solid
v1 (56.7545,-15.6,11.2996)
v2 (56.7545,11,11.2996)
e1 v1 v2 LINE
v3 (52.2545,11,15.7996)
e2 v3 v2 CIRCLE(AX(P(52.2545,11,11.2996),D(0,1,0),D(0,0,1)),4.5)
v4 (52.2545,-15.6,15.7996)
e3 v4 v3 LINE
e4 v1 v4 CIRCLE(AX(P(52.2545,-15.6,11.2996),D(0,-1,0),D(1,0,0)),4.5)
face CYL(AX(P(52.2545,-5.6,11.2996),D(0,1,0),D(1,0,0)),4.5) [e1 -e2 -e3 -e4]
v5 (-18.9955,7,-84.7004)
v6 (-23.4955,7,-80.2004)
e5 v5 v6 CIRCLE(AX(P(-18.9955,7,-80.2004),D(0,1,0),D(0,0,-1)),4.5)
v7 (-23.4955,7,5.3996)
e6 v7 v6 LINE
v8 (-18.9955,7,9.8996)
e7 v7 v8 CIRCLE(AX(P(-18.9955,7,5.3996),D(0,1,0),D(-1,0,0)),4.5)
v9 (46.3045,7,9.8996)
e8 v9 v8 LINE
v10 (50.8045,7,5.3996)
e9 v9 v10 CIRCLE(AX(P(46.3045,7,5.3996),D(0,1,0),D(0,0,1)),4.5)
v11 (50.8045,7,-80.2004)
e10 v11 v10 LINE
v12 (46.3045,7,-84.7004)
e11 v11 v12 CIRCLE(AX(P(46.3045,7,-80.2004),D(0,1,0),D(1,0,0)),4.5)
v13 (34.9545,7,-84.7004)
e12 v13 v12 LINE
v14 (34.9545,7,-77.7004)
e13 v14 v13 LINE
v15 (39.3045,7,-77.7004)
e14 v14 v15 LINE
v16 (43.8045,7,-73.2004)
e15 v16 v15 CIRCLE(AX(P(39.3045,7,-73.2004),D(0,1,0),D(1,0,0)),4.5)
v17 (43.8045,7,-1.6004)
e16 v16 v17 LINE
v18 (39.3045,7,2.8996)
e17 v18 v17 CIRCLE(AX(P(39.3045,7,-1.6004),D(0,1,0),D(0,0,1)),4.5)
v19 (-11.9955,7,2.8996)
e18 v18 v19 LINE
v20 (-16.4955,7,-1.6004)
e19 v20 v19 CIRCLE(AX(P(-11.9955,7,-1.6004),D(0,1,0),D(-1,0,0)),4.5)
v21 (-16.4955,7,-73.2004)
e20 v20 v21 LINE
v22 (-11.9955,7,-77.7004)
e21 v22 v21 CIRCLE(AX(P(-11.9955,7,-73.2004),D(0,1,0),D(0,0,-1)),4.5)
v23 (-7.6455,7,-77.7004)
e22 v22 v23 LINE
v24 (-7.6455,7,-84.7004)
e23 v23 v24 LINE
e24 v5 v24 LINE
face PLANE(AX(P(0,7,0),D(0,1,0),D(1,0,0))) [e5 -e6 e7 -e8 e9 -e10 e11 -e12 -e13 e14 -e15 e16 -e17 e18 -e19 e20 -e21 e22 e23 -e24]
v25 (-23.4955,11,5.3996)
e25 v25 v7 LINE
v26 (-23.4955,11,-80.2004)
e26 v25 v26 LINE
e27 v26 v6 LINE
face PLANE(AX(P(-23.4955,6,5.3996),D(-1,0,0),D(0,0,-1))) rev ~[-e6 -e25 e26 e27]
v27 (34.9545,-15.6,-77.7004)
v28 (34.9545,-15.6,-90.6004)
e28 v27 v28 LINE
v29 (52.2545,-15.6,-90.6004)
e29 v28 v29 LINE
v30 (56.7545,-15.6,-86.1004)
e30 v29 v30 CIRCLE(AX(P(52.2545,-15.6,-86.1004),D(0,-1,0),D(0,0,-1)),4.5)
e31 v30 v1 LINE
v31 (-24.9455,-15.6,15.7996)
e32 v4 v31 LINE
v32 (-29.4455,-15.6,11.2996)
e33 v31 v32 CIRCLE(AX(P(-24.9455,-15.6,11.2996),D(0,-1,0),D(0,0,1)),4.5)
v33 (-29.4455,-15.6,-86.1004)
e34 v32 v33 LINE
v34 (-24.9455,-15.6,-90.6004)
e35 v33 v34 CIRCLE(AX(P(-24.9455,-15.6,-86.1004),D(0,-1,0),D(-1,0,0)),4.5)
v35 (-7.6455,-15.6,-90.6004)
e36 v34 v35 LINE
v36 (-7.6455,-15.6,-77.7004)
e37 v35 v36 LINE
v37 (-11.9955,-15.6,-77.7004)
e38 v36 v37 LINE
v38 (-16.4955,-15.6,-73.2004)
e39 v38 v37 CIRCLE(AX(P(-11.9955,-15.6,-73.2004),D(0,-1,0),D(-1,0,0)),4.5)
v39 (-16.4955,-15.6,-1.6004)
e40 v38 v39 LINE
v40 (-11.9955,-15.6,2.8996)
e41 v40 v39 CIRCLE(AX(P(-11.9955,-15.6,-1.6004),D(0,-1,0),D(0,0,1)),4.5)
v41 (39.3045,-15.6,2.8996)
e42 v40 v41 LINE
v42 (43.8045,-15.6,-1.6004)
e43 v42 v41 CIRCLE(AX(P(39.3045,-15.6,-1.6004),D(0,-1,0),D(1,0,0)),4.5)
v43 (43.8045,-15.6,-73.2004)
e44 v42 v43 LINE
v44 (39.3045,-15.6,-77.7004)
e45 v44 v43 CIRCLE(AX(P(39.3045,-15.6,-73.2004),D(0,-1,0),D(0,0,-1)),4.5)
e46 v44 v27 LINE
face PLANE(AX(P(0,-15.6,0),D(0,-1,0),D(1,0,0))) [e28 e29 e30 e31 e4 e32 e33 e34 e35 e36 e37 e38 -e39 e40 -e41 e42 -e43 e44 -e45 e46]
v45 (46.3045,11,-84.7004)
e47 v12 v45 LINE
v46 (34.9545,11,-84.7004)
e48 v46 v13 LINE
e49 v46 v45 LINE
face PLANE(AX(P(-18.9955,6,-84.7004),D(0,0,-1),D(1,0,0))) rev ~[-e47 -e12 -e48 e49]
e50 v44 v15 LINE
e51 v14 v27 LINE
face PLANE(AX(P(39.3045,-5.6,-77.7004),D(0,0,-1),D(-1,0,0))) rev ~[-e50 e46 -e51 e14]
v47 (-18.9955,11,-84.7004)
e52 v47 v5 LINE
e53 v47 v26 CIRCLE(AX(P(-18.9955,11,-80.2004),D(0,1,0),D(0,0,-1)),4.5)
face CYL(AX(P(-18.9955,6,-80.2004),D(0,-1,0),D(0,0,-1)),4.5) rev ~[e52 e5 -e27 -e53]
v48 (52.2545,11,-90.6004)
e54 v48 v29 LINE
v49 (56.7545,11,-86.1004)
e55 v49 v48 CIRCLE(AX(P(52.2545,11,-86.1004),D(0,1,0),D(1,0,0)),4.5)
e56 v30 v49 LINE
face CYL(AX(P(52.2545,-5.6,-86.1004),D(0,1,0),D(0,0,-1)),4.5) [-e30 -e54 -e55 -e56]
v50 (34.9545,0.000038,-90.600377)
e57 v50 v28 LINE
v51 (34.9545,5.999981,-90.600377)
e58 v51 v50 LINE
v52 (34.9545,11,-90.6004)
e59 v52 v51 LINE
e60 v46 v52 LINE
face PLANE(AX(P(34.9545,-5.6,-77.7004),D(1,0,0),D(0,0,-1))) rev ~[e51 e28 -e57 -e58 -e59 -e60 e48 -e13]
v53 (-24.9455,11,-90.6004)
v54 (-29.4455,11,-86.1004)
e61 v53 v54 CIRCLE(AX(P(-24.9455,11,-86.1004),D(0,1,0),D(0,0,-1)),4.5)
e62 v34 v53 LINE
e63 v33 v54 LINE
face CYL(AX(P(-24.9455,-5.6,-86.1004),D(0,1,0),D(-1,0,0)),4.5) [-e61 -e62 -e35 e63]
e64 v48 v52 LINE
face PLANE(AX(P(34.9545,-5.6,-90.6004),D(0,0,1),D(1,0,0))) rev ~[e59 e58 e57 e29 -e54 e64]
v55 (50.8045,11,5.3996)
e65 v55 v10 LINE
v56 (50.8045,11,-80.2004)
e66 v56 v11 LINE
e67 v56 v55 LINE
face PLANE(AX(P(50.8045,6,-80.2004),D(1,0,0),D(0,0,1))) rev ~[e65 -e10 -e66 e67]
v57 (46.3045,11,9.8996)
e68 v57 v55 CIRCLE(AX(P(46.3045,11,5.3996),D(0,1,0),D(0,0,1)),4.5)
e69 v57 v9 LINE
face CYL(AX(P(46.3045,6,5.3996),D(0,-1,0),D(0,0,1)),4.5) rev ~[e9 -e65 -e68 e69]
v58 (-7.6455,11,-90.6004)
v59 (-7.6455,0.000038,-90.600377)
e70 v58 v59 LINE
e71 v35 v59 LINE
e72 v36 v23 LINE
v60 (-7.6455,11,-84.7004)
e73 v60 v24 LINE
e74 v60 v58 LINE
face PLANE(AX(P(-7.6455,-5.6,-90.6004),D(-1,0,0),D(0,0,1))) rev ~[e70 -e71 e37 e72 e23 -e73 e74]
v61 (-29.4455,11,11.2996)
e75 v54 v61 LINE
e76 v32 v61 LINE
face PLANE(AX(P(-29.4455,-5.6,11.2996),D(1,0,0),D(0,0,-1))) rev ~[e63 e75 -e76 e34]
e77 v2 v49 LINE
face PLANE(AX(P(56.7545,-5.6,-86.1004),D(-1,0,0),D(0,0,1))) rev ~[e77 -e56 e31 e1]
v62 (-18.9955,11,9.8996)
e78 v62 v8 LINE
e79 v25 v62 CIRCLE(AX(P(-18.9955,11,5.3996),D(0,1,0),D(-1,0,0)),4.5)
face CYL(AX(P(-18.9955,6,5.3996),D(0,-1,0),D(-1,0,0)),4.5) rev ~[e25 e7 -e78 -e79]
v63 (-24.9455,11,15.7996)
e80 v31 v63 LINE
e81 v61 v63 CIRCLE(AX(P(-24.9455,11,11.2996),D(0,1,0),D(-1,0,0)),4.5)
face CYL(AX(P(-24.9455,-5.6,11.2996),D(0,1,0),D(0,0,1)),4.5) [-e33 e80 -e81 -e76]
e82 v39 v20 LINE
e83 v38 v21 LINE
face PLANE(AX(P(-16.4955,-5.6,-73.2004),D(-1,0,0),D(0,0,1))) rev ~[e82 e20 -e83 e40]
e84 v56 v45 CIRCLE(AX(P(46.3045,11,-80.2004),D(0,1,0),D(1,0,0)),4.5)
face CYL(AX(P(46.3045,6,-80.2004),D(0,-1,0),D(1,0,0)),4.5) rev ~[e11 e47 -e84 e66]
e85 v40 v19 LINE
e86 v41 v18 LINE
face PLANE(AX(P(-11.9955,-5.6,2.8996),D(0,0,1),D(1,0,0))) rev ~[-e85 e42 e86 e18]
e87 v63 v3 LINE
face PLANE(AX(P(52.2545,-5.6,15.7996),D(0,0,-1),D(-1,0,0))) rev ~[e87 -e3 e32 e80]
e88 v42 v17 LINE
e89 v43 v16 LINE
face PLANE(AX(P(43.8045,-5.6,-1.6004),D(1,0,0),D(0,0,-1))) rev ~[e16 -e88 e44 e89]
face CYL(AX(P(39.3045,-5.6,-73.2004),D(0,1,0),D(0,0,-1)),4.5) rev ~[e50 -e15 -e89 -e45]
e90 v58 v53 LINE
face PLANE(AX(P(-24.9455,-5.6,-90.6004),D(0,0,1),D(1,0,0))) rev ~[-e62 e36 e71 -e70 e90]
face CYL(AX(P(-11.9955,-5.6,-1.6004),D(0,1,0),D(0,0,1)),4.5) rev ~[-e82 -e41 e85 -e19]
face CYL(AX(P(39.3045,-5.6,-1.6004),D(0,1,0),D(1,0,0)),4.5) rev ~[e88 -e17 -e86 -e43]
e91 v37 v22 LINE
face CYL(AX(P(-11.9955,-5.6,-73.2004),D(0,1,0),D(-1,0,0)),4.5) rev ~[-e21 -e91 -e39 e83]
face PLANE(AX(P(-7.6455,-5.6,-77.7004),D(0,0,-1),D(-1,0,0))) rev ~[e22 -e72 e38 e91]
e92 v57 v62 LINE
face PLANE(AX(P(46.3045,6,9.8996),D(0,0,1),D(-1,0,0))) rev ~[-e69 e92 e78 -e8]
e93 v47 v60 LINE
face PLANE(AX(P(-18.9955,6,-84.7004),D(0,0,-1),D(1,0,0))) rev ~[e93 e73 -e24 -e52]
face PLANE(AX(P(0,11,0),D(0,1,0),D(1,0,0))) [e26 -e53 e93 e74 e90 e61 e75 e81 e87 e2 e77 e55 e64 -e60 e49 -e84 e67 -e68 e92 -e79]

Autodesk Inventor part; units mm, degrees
ref_plane "YZ Plane" through (0, 0, 0) normal (1, 0, 0) x (0, 1, 0)
ref_plane "XZ Plane" through (0, 0, 0) normal (0, 1, 0) x (-1, 0, 0)
ref_plane "XY Plane" through (0, 0, 0) normal (0, 0, 1) x (1, 0, 0)
sketch "Sketch1" plane through (0, 0, 0) normal (0, 1, 0) x (-1, 0, 0)
  line L0 (23.4955, 9.8996) -> (-50.8045, 9.8996)
  line L1 (-50.8045, 9.8996) -> (-50.8045, -84.7004)
  line L2 (-50.8045, -84.7004) -> (23.4955, -84.7004)
  line L3 (23.4955, -84.7004) -> (23.4955, 9.8996)
  line L4 (29.4455, 15.7996) -> (-56.7545, 15.7996)
  line L5 (-56.7545, 15.7996) -> (-56.7545, -90.6004)
  line L6 (-56.7545, -90.6004) -> (29.4455, -90.6004)
  line L7 (29.4455, -90.6004) -> (29.4455, 15.7996)
  line L8 (29.4455, -37.4004) -> (-56.7545, -37.4004) construction
  line L9 (-13.6545, -90.6004) -> (-13.6545, 15.7996) construction
  dimension "d0" = 94.6
  dimension "d1" = 74.3
  dimension "d2" = 106.4
  dimension "d3" = 86.2
extrude "Extrusion1" add sketch "Sketch1" along normal blind 6
fillet "Fillet1" radius 4.5 4 edges at (-23.4955, 3, 9.8996) (50.8045, 3, 9.8996) (50.8045, 3, -84.7004) (-23.4955, 3, -84.7004)
fillet "Fillet2" radius 4.5 4 edges at (56.7545, 3, 15.7996) (-29.4455, 3, 15.7996) (56.7545, 3, -90.6004) (-29.4455, 3, -90.6004)
sketch "Sketch2" plane through (0, 0, 0) normal (0, -1, 0) x (1, 0, 0)
  line L0 (50.8045, -80.2004) -> (50.8045, 5.3996) projected
  arc A0 (46.3045, -84.7004) -> (50.8045, -80.2004) centre (46.3045, -80.2004) ccw projected
  line L1 (-18.9955, -84.7004) -> (46.3045, -84.7004) projected
  arc A1 (-23.4955, -80.2004) -> (-18.9955, -84.7004) centre (-18.9955, -80.2004) ccw projected
  line L2 (-23.4955, 5.3996) -> (-23.4955, -80.2004) projected
  arc A2 (-18.9955, 9.8996) -> (-23.4955, 5.3996) centre (-18.9955, 5.3996) ccw projected
  line L3 (46.3045, 9.8996) -> (-18.9955, 9.8996) projected
  arc A3 (50.8045, 5.3996) -> (46.3045, 9.8996) centre (46.3045, 5.3996) ccw projected
  line L4 (43.8045, -77.7004) -> (-16.4955, -77.7004)
  line L5 (-16.4955, -77.7004) -> (-16.4955, 2.8996)
  line L6 (-16.4955, 2.8996) -> (43.8045, 2.8996)
  line L7 (43.8045, 2.8996) -> (43.8045, -77.7004)
  line L8 (13.6545, -84.7004) -> (13.6545, 9.8996) construction
  line L9 (46.3045, 9.8996) -> (-18.9955, 9.8996) construction
  line L10 (50.8045, -80.2004) -> (50.8045, 5.3996) construction
  line L11 (50.8045, -37.4004) -> (-23.4955, -37.4004) construction
  line L12 (56.7545, 11.2996) -> (56.7545, -86.1004) construction
  point P0 (0, 0)
  dimension "d8" = 5.95
  dimension "d9" = 7
  dimension "d10" = 7
extrude "Extrusion2" add sketch "Sketch2" along normal blind 6
fillet "Fillet3" radius 4.5 4 edges at (43.8045, -3, -77.7004) (43.8045, -3, 2.8996) (-16.4955, -3, 2.8996) (-16.4955, -3, -77.7004)
sketch "Sketch3" plane through (0, 0, 0) normal (0, 1, 0) x (1, 0, 0)
  arc A0 (46.3045, -9.8996) -> (50.8045, -5.3996) centre (46.3045, -5.3996) ccw projected
  line L0 (50.8045, 80.2004) -> (50.8045, -5.3996) projected
  arc A1 (50.8045, 80.2004) -> (46.3045, 84.7004) centre (46.3045, 80.2004) ccw projected
  line L1 (-18.9955, 84.7004) -> (46.3045, 84.7004) projected
  arc A2 (-18.9955, 84.7004) -> (-23.4955, 80.2004) centre (-18.9955, 80.2004) ccw projected
  line L2 (-23.4955, -5.3996) -> (-23.4955, 80.2004) projected
  arc A3 (-23.4955, -5.3996) -> (-18.9955, -9.8996) centre (-18.9955, -5.3996) ccw projected
  line L3 (46.3045, -9.8996) -> (-18.9955, -9.8996) projected
  arc A4 (43.8045, 73.2004) -> (39.3045, 77.7004) centre (39.3045, 73.2004) ccw projected
  line L4 (43.8045, 1.6004) -> (43.8045, 73.2004) projected
  arc A5 (39.3045, -2.8996) -> (43.8045, 1.6004) centre (39.3045, 1.6004) ccw projected
  line L5 (-11.9955, -2.8996) -> (39.3045, -2.8996) projected
  arc A6 (-16.4955, 1.6004) -> (-11.9955, -2.8996) centre (-11.9955, 1.6004) ccw projected
  line L6 (-16.4955, 73.2004) -> (-16.4955, 1.6004) projected
  arc A7 (-11.9955, 77.7004) -> (-16.4955, 73.2004) centre (-11.9955, 73.2004) ccw projected
  line L7 (39.3045, 77.7004) -> (-11.9955, 77.7004) projected
  point P0 (0, 0)
extrude "Extrusion3" add sketch "Sketch3" along normal blind 2
ref_plane "Work Plane1" through (-23.4955, 6, -84.7004) normal (0, 0.7071068, -0.7071068) x (1, 0, 0)
sketch "Sketch5" plane through (-23.4955, 6, -84.7004) normal (0, 0.7071068, -0.7071068) x (1, 0, 0)
  line L0 (4.5, 0) -> (69.8, 0) projected
  line L1 (37.15, 0) -> (37.15, -42.3796) construction
  circle A0 centre (37.15, 1.34) radius 1.34 construction
  line L2 (37.15, 1.34) -> (37.15, -18.66) construction
  line L3 (38.49, 1.34) -> (38.49, -18.66)
  line L4 (35.81, -18.66) -> (35.81, 1.34)
  arc A1 (38.49, 1.34) -> (35.81, 1.34) centre (37.15, 1.34) ccw
  arc A2 (35.81, -18.66) -> (38.49, -18.66) centre (37.15, -18.66) ccw
  point P0 (23.4955, -55.6496)
  point P1 (37.15, -8.66)
  dimension "d20" = 2.68
  dimension "d19" = 90
  dimension "d21" = 20
  dimension "d22" = 2.68
extrude "Extrusion5" cut sketch "Sketch5" along normal mid plane 51.82
sketch "Sketch6" plane through (-23.4955, 6, -84.7004) normal (0, 0.7071068, -0.7071068) x (1, 0, 0)
  arc A0 (38.49, 1.34) -> (35.81, 1.34) centre (37.15, 1.34) ccw projected
  line L0 (38.49, 0) -> (38.49, 1.34) projected
  arc A1 (38.49, 1.34) -> (35.81, 1.34) centre (37.15, 1.34) ccw projected
  line L1 (35.81, 1.34) -> (35.81, 0) projected
  line L2 (4.5, 0) -> (35.81, 0) projected
  line L3 (4.5, 2.8284) -> (4.5, 0) projected
  line L4 (4.5, 2.8284) -> (69.8, 2.8284) projected
  line L5 (69.8, 0) -> (69.8, 2.8284) projected
  line L6 (38.49, 0) -> (69.8, 0) projected
  line L7 (75.75, 8.4146) -> (-1.45, 8.4146) projected
  line L8 (74.9473, 2.68) -> (-18.0058, 2.68) construction
  line L9 (0, -55.225) -> (0, 5.3033) construction
  line L10 (90.8097, 9.1284) -> (-67.1811, 9.1284) construction
  line L11 (37.15, 2.68) -> (37.15, 37.6448) construction
  line L12 (58.45, 9.1284) -> (15.85, 9.1284)
  line L13 (15.85, 9.1284) -> (15.85, 13.1284)
  line L14 (15.85, 13.1284) -> (58.45, 13.1284)
  line L15 (58.45, 13.1284) -> (58.45, 9.1284)
  point P0 (23.4955, -55.6496)
  dimension "d25" = 6.3
  dimension "d26" = 42.6
  dimension "d27" = 4
extrude "Extrusion6" add sketch "Sketch6" along normal blind 35 contours L12 L13 L14 L15
sketch "Sketch7" plane through (-23.4955, 30.7487, -109.4492) normal (0, 0.7071068, -0.7071068) x (-1, 0, 0)
  line L0 (-15.85, -13.1284) -> (-15.85, -9.1284) projected
  line L1 (-58.45, -9.1284) -> (-58.45, -13.1284) projected
  point P0 (-23.4955, 55.6496)
  point P1 (-15.85, -11.1284)
  point P2 (-58.45, -11.1284)
  dimension "d30" = 42.6
sketch "Sketch8" plane through (34.9545, -3.2832, -93.9836) normal (1, 0, 0) x (0, 0.7071068, -0.7071068)
  line L0 (-0.0707, 4.7139) -> (-3.2527, 7.8958) projected
  line L1 (0.9899, 12.1385) -> (4.1719, 8.9565) projected
  line L2 (0, 0) -> (35, 0) projected
  line L3 (-0.0707, 4.7139) -> (-14.2134, -9.4288) construction
  line L4 (0, 4) -> (35, 4) projected
  line L5 (0, 4) -> (0, 0) projected
  line L6 (4.1719, 8.9565) -> (-4.7846, 0)
  line L7 (-4.7846, 0) -> (0, 0)
  line L8 (0, 0) -> (0, 4) projected
  line L9 (0, 0) -> (0, 4)
  line L10 (4.1719, 8.9565) -> (4.1719, 4)
  line L11 (0, 4) -> (35, 4) projected
  line L12 (4.1719, 4) -> (0, 4)
  line L13 (-0.0707, 4.7139) -> (4.1719, 8.9565) projected
  point P0 (-64.1349, 68.778)
  point P1 (4.1719, 4)
extrude "Extrusion7" add sketch "Sketch8" against normal blind 42.6
sketch "Sketch9" plane through (34.9545, -6.6664, -90.6004) normal (1, 0, 0) x (0, 0, -1)
  line L0 (0, 6.6664) -> (0, 0) projected
  line L1 (0, 0) -> (28.1319, 28.1319) projected
  line L2 (0, 0) -> (0, 6.6664) projected
  line L3 (0, 0) -> (0, -20)
  line L4 (0, -20) -> (5, -20)
  line L5 (5, -20) -> (5, 5)
  line L6 (0, 0) -> (28.1319, 28.1319) projected
  line L7 (5, 5) -> (0, 0)
  point P0 (-90.6004, 6.6664)
  point P1 (5, 5)
  dimension "d33" = 5
  dimension "d34" = 20
extrude "Extrusion8" add sketch "Sketch9" against normal blind 42.6
sketch "Sketch10" plane through (-7.6455, 24.294, -115.9039) normal (0, 0.7071068, 0.7071068) x (1, 0, 0)
  line L0 (0, -30.8281) -> (42.6, -30.8281) projected
  line L1 (42.6, -30.8281) -> (42.6, 0) projected
  line L2 (0, 0) -> (42.6, 0) projected
  line L3 (0, -30.8281) -> (0, 0) projected
  line L4 (42.6, -30.8281) -> (0, -30.8281) projected
  line L5 (0, -30.8281) -> (5, -30.8281)
  line L6 (5, -30.8281) -> (5, 0)
  line L7 (5, 0) -> (0, 0)
  line L8 (0, 0) -> (0, -30.8281)
  line L9 (42.6, 0) -> (0, 0) projected
  line L10 (37.6, 0) -> (42.6, 0)
  line L11 (42.6, 0) -> (42.6, -30.8281)
  line L12 (42.6, -30.8281) -> (37.6, -30.8281)
  line L13 (37.6, -30.8281) -> (37.6, 0)
  point P0 (7.6455, -99.1349)
  point P1 (37.6, 0)
  point P2 (37.6, -30.8281)
  dimension "d37" = 5
  dimension "d38" = 5
extrude "Extrusion9" add sketch "Sketch10" along normal blind 19 contours L3 L2 L6 L0 | L13 L2 L1 L0
sketch "Sketch11" plane through (-7.6455, 37.729, -102.4689) normal (0, 0.7071068, 0.7071068) x (1, 0, 0)
  line L0 (0, -30.8281) -> (5, -30.8281) projected
  line L1 (5, 0) -> (0, 0) projected
  point P0 (7.6455, -99.1349)
  point P1 (2.5, 0)
  point P2 (2.5, -30.8281)
  dimension "d41" = 30.8281
sketch "Sketch12" plane through (-2.6455, 2.4952, -94.1052) normal (1, 0, 0) x (0, -0.7071068, -0.7071068)
  line L0 (0, 30.8281) -> (0, 0) projected
  line L1 (0, 30.8281) -> (-19, 30.8281) projected
  line L2 (-19, 0) -> (-19, 30.8281) projected
  line L3 (-4.9565, 0) -> (-19, 0) projected
  line L4 (0, 0) -> (-4.9565, 0) projected
  line L5 (-19, 30.8281) -> (-15, 30.8281)
  line L6 (-15, 30.8281) -> (-15, 0)
  line L7 (-15, 0) -> (-19, 0)
  line L8 (-19, 0) -> (-19, 30.8281)
  point P0 (-64.778, -68.3068)
  dimension "d42" = 15
extrude "Extrusion10" add sketch "Sketch12" along normal blind 8.5 contours L6 L3 L2 L1
sketch "Sketch13" plane through (29.9545, 2.4952, -94.1052) normal (-1, 0, 0) x (0, 0.7071068, 0.7071068)
  line L0 (0, 0) -> (0, 30.8281) projected
  line L1 (4.9565, 0) -> (0, 0) projected
  line L2 (4.9565, 0) -> (19, 0) projected
  line L3 (19, 30.8281) -> (19, 0) projected
  line L4 (0, 30.8281) -> (19, 30.8281) projected
  line L5 (19, 30.8281) -> (7.45, 30.8281)
  line L6 (7.45, 30.8281) -> (7.45, 0)
  line L7 (7.45, 0) -> (19, 0)
  line L8 (19, 0) -> (19, 30.8281)
  point P0 (64.778, -68.3068)
  point P1 (7.45, 30.8281)
  dimension "d45" = 7.45
extrude "Extrusion11" add sketch "Sketch13" along normal blind 8.5 contours L4 L3 L2 L6
sketch "Sketch14" plane through (34.9545, -26.6664, -90.6004) normal (1, 0, 0) x (0, 0, -1)
  line L0 (5, 25) -> (28.1319, 48.1319) projected
  line L1 (28.1319, 48.1319) -> (11.8685, 64.3954) projected
  line L2 (-9.9303, 42.5967) -> (11.8685, 64.3954) projected
  line L3 (0, 32.6664) -> (-9.9303, 42.5967) projected
  line L4 (0, 26.6664) -> (0, 32.6664) projected
  line L5 (0, 26.6664) -> (0, 0) projected
  line L6 (0, 0) -> (5, 0) projected
  line L7 (5, 0) -> (5, 25) projected
  line L8 (0, 32.6664) -> (3.5048, 29.1616) construction
  line L9 (-9.9303, 42.5967) -> (11.8685, 64.3954) construction
  line L10 (-7.1018, 39.7682) -> (14.6969, 61.567) construction
  line L11 (0, 32.6664) -> (-1.7632, 34.4296) projected
  line L12 (0, 52.5269) -> (0, 32.6664)
  line L13 (-1.7632, 34.4296) -> (-9.9303, 42.5967) projected
  line L14 (0, 32.6664) -> (-9.9303, 42.5967)
  line L15 (-9.9303, 42.5967) -> (0, 52.5269)
  point P0 (-90.6004, 26.6664)
  point P1 (11.8685, 64.3954)
  point P2 (0, 52.5269)
extrude "Extrusion12" cut sketch "Sketch14" against normal blind 100 contours L12 L3 L2
sketch "Sketch15" plane through (-23.4955, 30.7487, -109.4492) normal (0, 0.7071068, -0.7071068) x (-1, 0, 0)
  line L0 (-58.45, -13.1284) -> (-15.85, -13.1284) projected
  line L1 (-15.85, -13.1284) -> (-15.85, 9.8716) projected
  line L2 (-15.85, 9.8716) -> (-29.35, 9.8716) projected
  line L3 (-29.35, 5.8716) -> (-29.35, 9.8716) projected
  line L4 (-20.85, 5.8716) -> (-29.35, 5.8716) projected
  line L5 (-20.85, -9.1284) -> (-20.85, 5.8716) projected
  line L6 (-20.85, -9.1284) -> (-53.45, -9.1284) projected
  line L7 (-53.45, -9.1284) -> (-53.45, -1.6784) projected
  line L8 (-53.45, -1.6784) -> (-44.95, -1.6784) projected
  line L9 (-44.95, 9.8716) -> (-44.95, -1.6784) projected
  line L10 (-58.45, 9.8716) -> (-44.95, 9.8716) projected
  line L11 (-58.45, -13.1284) -> (-58.45, 9.8716) projected
  line L12 (-58.45, 9.8716) -> (-44.95, 9.8716)
  line L13 (-44.95, 9.8716) -> (-44.95, 2.3216)
  line L14 (-44.95, 2.3216) -> (-58.45, 2.3216)
  line L15 (-58.45, 2.3216) -> (-58.45, 9.8716)
  point P0 (-23.4955, 55.6496)
  point P1 (-51.7, 2.3216)
  point P2 (-58.45, 2.3216)
  dimension "d52" = 4
extrude "Extrusion13" cut sketch "Sketch15" against normal blind 100 contours L11 L10 L9 L14
sketch "Sketch16" plane through (-2.6455, 24.294, -115.9039) normal (0, 0.7071068, 0.7071068) x (1, 0, 0)
  line L0 (32.6, -30.8281) -> (0, -30.8281) projected
  line L1 (8.5, -20.7846) -> (0, -20.7846) projected
  point P0 (2.6455, -99.1349)
  dimension "d55" = 10.0435
sketch "Sketch17" plane through (-2.6455, 6, -90.6004) normal (1, 0, 0) x (0, 0, -1)
  line L0 (0, 14.2037) -> (0, 0) projected
  line L1 (3.5048, -3.5048) -> (0, 0) projected
  line L2 (25.3035, 18.294) -> (3.5048, -3.5048) projected
  line L3 (25.3035, 18.294) -> (14.6969, 28.9006) projected
  line L4 (14.6969, 28.9006) -> (0, 14.2037) projected
  line L5 (5.6261, -1.3835) -> (3.5048, -3.5048)
  line L6 (3.5048, -3.5048) -> (0, 0)
  line L7 (0, 0) -> (2.1213, 2.1213)
  line L8 (2.1213, 2.1213) -> (5.6261, -1.3835)
  point P0 (-90.6004, -6)
  dimension "d56" = 3
extrude "Extrusion14" add sketch "Sketch17" along normal blind 34.75 contours L7 L8 L2 L1
sketch "Sketch18" plane through (0, -6, 0) normal (0, -1, 0) x (1, 0, 0)
  line L0 (-18.9955, -84.7004) -> (46.3045, -84.7004) projected
  line L1 (39.3045, -77.7004) -> (-11.9955, -77.7004) projected
  line L2 (-7.6455, -95.6004) -> (-7.6455, -90.6004) projected
  line L3 (34.9545, -90.6004) -> (34.9545, -95.6004) projected
  line L4 (-18.9955, -84.7004) -> (46.3045, -84.7004) projected
  line L5 (-7.6455, -84.7004) -> (34.9545, -84.7004)
  line L6 (34.9545, -84.7004) -> (34.9545, -77.7004)
  line L7 (34.9545, -77.7004) -> (-7.6455, -77.7004)
  line L8 (-7.6455, -77.7004) -> (-7.6455, -84.7004)
  point P0 (0, 0)
extrude "Extrusion15" add sketch "Sketch18" along normal blind 20
fillet "Fillet5" radius 5 2 edges at (5.8545, 36.3148, -103.8831) (21.4545, 30.9761, -109.2218)
sketch "Sketch19" plane through (0, 6, 0) normal (0, 1, 0) x (1, 0, 0)
  line L0 (14.9945, 86.5955) -> (14.9945, 84.7004) projected
  line L1 (14.9945, 84.7004) -> (46.3045, 84.7004) projected
  arc A0 (50.8045, 80.2004) -> (46.3045, 84.7004) centre (46.3045, 80.2004) ccw projected
  line L2 (50.8045, 80.2004) -> (50.8045, -5.3996) projected
  arc A1 (46.3045, -9.8996) -> (50.8045, -5.3996) centre (46.3045, -5.3996) ccw projected
  line L3 (46.3045, -9.8996) -> (-18.9955, -9.8996) projected
  arc A2 (-23.4955, -5.3996) -> (-18.9955, -9.8996) centre (-18.9955, -5.3996) ccw projected
  line L4 (-23.4955, -5.3996) -> (-23.4955, 80.2004) projected
  arc A3 (-18.9955, 84.7004) -> (-23.4955, 80.2004) centre (-18.9955, 80.2004) ccw projected
  line L5 (-18.9955, 84.7004) -> (12.3145, 84.7004) projected
  line L6 (12.3145, 84.7004) -> (12.3145, 86.5955) projected
  ellipse E0 centre (13.6545, 86.5955) end of major axis (13.6545, 88.4905) minor radius 1.34 (14.9945, 86.5955) -> (12.3145, 86.5955) ccw projected
  arc A4 (-24.9455, 90.6004) -> (-29.4455, 86.1004) centre (-24.9455, 86.1004) ccw projected
  line L7 (-29.4455, 86.1004) -> (-29.4455, -11.2996) projected
  arc A5 (-29.4455, -11.2996) -> (-24.9455, -15.7996) centre (-24.9455, -11.2996) ccw projected
  line L8 (-24.9455, -15.7996) -> (52.2545, -15.7996) projected
  arc A6 (52.2545, -15.7996) -> (56.7545, -11.2996) centre (52.2545, -11.2996) ccw projected
  line L9 (56.7545, -11.2996) -> (56.7545, 86.1004) projected
  arc A7 (56.7545, 86.1004) -> (52.2545, 90.6004) centre (52.2545, 86.1004) ccw projected
  line L10 (52.2545, 90.6004) -> (34.9545, 90.6004) projected
  line L11 (34.9545, 90.6004) -> (29.9545, 90.6004) projected
  line L12 (29.9545, 90.6004) -> (-2.6455, 90.6004) projected
  line L13 (-2.6455, 90.6004) -> (-7.6455, 90.6004) projected
  line L14 (-7.6455, 90.6004) -> (-24.9455, 90.6004) projected
  point P0 (0, 0)
extrude "Extrusion16" add sketch "Sketch19" along normal blind 5
sketch "Sketch20" plane through (0, 2, 0) normal (0, 1, 0) x (1, 0, 0)
  line L0 (14.9945, 82.5955) -> (14.9945, 77.7004) projected
  line L1 (14.9945, 77.7004) -> (39.3045, 77.7004) projected
  arc A0 (43.8045, 73.2004) -> (39.3045, 77.7004) centre (39.3045, 73.2004) ccw projected
  line L2 (43.8045, 73.2004) -> (43.8045, 1.6004) projected
  arc A1 (39.3045, -2.8996) -> (43.8045, 1.6004) centre (39.3045, 1.6004) ccw projected
  line L3 (39.3045, -2.8996) -> (-11.9955, -2.8996) projected
  arc A2 (-16.4955, 1.6004) -> (-11.9955, -2.8996) centre (-11.9955, 1.6004) ccw projected
  line L4 (-16.4955, 1.6004) -> (-16.4955, 73.2004) projected
  arc A3 (-11.9955, 77.7004) -> (-16.4955, 73.2004) centre (-11.9955, 73.2004) ccw projected
  line L5 (-11.9955, 77.7004) -> (12.3145, 77.7004) projected
  line L6 (12.3145, 77.7004) -> (12.3145, 82.5955) projected
  ellipse E0 centre (13.6545, 82.5955) end of major axis (13.6545, 84.4905) minor radius 1.34 (14.9945, 82.5955) -> (12.3145, 82.5955) ccw projected
  line L7 (46.3045, -9.8996) -> (-18.9955, -9.8996) projected
  arc A4 (46.3045, -9.8996) -> (50.8045, -5.3996) centre (46.3045, -5.3996) ccw projected
  line L8 (50.8045, 80.2004) -> (50.8045, -5.3996) projected
  arc A5 (50.8045, 80.2004) -> (46.3045, 84.7004) centre (46.3045, 80.2004) ccw projected
  line L9 (-18.9955, 84.7004) -> (46.3045, 84.7004) projected
  arc A6 (-18.9955, 84.7004) -> (-23.4955, 80.2004) centre (-18.9955, 80.2004) ccw projected
  line L10 (-23.4955, -5.3996) -> (-23.4955, 80.2004) projected
  arc A7 (-23.4955, -5.3996) -> (-18.9955, -9.8996) centre (-18.9955, -5.3996) ccw projected
  point P0 (0, 0)
extrude "Extrusion17" add sketch "Sketch20" along normal blind 5
sketch "Sketch21" plane through (0, 11, 0) normal (0, 1, 0) x (1, 0, 0)
  line L0 (-7.6455, 118.7324) -> (-7.6455, 102.4689) projected
  line L1 (34.9545, 118.7324) -> (34.9545, 107.8076) projected
  line L2 (34.9545, 118.7324) -> (-7.6455, 118.7324) projected
  line L3 (-11.9955, 77.7004) -> (12.3145, 77.7004) projected
  line L4 (14.9945, 77.7004) -> (39.3045, 77.7004) projected
  line L5 (34.9545, 77.7004) -> (-7.6455, 77.7004) projected
  line L6 (-7.6455, 118.7324) -> (34.9545, 118.7324)
  line L7 (34.9545, 118.7324) -> (34.9545, 77.7004)
  line L8 (34.9545, 77.7004) -> (-7.6455, 77.7004)
  line L9 (-7.6455, 77.7004) -> (-7.6455, 118.7324)
  point P0 (0, 0)
extrude "Extrusion18" cut sketch "Sketch21" along normal mid plane 100
sketch "Sketch22" plane through (0, 0, 0) normal (0, -1, 0) x (1, 0, 0)
  line L0 (87.9396, -104.4246) -> (-53.0165, -104.4246)
  line L1 (-53.0165, -104.4246) -> (-53.0165, 23.665)
  line L2 (-53.0165, 23.665) -> (87.9396, 23.665)
  line L3 (87.9396, 23.665) -> (87.9396, -104.4246)
  point P0 (0, 0)
extrude "Extrusion19" cut sketch "Sketch22" along normal blind 100
sketch "Sketch23" plane through (0, 0, 0) normal (0, -1, 0) x (1, 0, 0)
  line L0 (34.9545, -77.7004) -> (34.9545, -90.6004) projected
  line L1 (52.2545, -90.6004) -> (34.9545, -90.6004) projected
  arc A0 (52.2545, -90.6004) -> (56.7545, -86.1004) centre (52.2545, -86.1004) ccw projected
  line L2 (56.7545, 11.2996) -> (56.7545, -86.1004) projected
  arc A1 (56.7545, 11.2996) -> (52.2545, 15.7996) centre (52.2545, 11.2996) ccw projected
  line L3 (-24.9455, 15.7996) -> (52.2545, 15.7996) projected
  arc A2 (-24.9455, 15.7996) -> (-29.4455, 11.2996) centre (-24.9455, 11.2996) ccw projected
  line L4 (-29.4455, -86.1004) -> (-29.4455, 11.2996) projected
  arc A3 (-29.4455, -86.1004) -> (-24.9455, -90.6004) centre (-24.9455, -86.1004) ccw projected
  line L5 (-7.6455, -90.6004) -> (-24.9455, -90.6004) projected
  line L6 (-7.6455, -77.7004) -> (-7.6455, -90.6004) projected
  line L7 (-11.9955, -77.7004) -> (-7.6455, -77.7004) projected
  arc A4 (-16.4955, -73.2004) -> (-11.9955, -77.7004) centre (-11.9955, -73.2004) ccw projected
  line L8 (-16.4955, -1.6004) -> (-16.4955, -73.2004) projected
  arc A5 (-11.9955, 2.8996) -> (-16.4955, -1.6004) centre (-11.9955, -1.6004) ccw projected
  line L9 (39.3045, 2.8996) -> (-11.9955, 2.8996) projected
  arc A6 (43.8045, -1.6004) -> (39.3045, 2.8996) centre (39.3045, -1.6004) ccw projected
  line L10 (43.8045, -73.2004) -> (43.8045, -1.6004) projected
  arc A7 (39.3045, -77.7004) -> (43.8045, -73.2004) centre (39.3045, -73.2004) ccw projected
  line L11 (34.9545, -77.7004) -> (39.3045, -77.7004) projected
  point P0 (0, 0)
extrude "Extrusion20" add sketch "Sketch23" along normal blind 5.6
sketch "Sketch24" plane through (0, -5.6, 0) normal (0, -1, 0) x (1, 0, 0)
  point P0 (0, 0)
sketch "Sketch25" plane through (0, -5.6, 0) normal (0, -1, 0) x (1, 0, 0)
  line L0 (34.9545, -77.7004) -> (34.9545, -90.6004) projected
  line L1 (34.9545, -90.6004) -> (52.2545, -90.6004) projected
  arc A0 (52.2545, -90.6004) -> (56.7545, -86.1004) centre (52.2545, -86.1004) ccw projected
  line L2 (56.7545, -86.1004) -> (56.7545, 11.2996) projected
  arc A1 (56.7545, 11.2996) -> (52.2545, 15.7996) centre (52.2545, 11.2996) ccw projected
  line L3 (52.2545, 15.7996) -> (-24.9455, 15.7996) projected
  arc A2 (-24.9455, 15.7996) -> (-29.4455, 11.2996) centre (-24.9455, 11.2996) ccw projected
  line L4 (-29.4455, 11.2996) -> (-29.4455, -86.1004) projected
  arc A3 (-29.4455, -86.1004) -> (-24.9455, -90.6004) centre (-24.9455, -86.1004) ccw projected
  line L5 (-24.9455, -90.6004) -> (-7.6455, -90.6004) projected
  line L6 (-7.6455, -90.6004) -> (-7.6455, -77.7004) projected
  line L7 (-7.6455, -77.7004) -> (-11.9955, -77.7004) projected
  arc A4 (-16.4955, -73.2004) -> (-11.9955, -77.7004) centre (-11.9955, -73.2004) ccw projected
  line L8 (-16.4955, -73.2004) -> (-16.4955, -1.6004) projected
  arc A5 (-11.9955, 2.8996) -> (-16.4955, -1.6004) centre (-11.9955, -1.6004) ccw projected
  line L9 (-11.9955, 2.8996) -> (39.3045, 2.8996) projected
  arc A6 (43.8045, -1.6004) -> (39.3045, 2.8996) centre (39.3045, -1.6004) ccw projected
  line L10 (43.8045, -1.6004) -> (43.8045, -73.2004) projected
  arc A7 (39.3045, -77.7004) -> (43.8045, -73.2004) centre (39.3045, -73.2004) ccw projected
  line L11 (39.3045, -77.7004) -> (34.9545, -77.7004) projected
  point P0 (0, 0)
extrude "Extrusion21" add sketch "Sketch25" along normal blind 10
properties part number "Upper_frame"
